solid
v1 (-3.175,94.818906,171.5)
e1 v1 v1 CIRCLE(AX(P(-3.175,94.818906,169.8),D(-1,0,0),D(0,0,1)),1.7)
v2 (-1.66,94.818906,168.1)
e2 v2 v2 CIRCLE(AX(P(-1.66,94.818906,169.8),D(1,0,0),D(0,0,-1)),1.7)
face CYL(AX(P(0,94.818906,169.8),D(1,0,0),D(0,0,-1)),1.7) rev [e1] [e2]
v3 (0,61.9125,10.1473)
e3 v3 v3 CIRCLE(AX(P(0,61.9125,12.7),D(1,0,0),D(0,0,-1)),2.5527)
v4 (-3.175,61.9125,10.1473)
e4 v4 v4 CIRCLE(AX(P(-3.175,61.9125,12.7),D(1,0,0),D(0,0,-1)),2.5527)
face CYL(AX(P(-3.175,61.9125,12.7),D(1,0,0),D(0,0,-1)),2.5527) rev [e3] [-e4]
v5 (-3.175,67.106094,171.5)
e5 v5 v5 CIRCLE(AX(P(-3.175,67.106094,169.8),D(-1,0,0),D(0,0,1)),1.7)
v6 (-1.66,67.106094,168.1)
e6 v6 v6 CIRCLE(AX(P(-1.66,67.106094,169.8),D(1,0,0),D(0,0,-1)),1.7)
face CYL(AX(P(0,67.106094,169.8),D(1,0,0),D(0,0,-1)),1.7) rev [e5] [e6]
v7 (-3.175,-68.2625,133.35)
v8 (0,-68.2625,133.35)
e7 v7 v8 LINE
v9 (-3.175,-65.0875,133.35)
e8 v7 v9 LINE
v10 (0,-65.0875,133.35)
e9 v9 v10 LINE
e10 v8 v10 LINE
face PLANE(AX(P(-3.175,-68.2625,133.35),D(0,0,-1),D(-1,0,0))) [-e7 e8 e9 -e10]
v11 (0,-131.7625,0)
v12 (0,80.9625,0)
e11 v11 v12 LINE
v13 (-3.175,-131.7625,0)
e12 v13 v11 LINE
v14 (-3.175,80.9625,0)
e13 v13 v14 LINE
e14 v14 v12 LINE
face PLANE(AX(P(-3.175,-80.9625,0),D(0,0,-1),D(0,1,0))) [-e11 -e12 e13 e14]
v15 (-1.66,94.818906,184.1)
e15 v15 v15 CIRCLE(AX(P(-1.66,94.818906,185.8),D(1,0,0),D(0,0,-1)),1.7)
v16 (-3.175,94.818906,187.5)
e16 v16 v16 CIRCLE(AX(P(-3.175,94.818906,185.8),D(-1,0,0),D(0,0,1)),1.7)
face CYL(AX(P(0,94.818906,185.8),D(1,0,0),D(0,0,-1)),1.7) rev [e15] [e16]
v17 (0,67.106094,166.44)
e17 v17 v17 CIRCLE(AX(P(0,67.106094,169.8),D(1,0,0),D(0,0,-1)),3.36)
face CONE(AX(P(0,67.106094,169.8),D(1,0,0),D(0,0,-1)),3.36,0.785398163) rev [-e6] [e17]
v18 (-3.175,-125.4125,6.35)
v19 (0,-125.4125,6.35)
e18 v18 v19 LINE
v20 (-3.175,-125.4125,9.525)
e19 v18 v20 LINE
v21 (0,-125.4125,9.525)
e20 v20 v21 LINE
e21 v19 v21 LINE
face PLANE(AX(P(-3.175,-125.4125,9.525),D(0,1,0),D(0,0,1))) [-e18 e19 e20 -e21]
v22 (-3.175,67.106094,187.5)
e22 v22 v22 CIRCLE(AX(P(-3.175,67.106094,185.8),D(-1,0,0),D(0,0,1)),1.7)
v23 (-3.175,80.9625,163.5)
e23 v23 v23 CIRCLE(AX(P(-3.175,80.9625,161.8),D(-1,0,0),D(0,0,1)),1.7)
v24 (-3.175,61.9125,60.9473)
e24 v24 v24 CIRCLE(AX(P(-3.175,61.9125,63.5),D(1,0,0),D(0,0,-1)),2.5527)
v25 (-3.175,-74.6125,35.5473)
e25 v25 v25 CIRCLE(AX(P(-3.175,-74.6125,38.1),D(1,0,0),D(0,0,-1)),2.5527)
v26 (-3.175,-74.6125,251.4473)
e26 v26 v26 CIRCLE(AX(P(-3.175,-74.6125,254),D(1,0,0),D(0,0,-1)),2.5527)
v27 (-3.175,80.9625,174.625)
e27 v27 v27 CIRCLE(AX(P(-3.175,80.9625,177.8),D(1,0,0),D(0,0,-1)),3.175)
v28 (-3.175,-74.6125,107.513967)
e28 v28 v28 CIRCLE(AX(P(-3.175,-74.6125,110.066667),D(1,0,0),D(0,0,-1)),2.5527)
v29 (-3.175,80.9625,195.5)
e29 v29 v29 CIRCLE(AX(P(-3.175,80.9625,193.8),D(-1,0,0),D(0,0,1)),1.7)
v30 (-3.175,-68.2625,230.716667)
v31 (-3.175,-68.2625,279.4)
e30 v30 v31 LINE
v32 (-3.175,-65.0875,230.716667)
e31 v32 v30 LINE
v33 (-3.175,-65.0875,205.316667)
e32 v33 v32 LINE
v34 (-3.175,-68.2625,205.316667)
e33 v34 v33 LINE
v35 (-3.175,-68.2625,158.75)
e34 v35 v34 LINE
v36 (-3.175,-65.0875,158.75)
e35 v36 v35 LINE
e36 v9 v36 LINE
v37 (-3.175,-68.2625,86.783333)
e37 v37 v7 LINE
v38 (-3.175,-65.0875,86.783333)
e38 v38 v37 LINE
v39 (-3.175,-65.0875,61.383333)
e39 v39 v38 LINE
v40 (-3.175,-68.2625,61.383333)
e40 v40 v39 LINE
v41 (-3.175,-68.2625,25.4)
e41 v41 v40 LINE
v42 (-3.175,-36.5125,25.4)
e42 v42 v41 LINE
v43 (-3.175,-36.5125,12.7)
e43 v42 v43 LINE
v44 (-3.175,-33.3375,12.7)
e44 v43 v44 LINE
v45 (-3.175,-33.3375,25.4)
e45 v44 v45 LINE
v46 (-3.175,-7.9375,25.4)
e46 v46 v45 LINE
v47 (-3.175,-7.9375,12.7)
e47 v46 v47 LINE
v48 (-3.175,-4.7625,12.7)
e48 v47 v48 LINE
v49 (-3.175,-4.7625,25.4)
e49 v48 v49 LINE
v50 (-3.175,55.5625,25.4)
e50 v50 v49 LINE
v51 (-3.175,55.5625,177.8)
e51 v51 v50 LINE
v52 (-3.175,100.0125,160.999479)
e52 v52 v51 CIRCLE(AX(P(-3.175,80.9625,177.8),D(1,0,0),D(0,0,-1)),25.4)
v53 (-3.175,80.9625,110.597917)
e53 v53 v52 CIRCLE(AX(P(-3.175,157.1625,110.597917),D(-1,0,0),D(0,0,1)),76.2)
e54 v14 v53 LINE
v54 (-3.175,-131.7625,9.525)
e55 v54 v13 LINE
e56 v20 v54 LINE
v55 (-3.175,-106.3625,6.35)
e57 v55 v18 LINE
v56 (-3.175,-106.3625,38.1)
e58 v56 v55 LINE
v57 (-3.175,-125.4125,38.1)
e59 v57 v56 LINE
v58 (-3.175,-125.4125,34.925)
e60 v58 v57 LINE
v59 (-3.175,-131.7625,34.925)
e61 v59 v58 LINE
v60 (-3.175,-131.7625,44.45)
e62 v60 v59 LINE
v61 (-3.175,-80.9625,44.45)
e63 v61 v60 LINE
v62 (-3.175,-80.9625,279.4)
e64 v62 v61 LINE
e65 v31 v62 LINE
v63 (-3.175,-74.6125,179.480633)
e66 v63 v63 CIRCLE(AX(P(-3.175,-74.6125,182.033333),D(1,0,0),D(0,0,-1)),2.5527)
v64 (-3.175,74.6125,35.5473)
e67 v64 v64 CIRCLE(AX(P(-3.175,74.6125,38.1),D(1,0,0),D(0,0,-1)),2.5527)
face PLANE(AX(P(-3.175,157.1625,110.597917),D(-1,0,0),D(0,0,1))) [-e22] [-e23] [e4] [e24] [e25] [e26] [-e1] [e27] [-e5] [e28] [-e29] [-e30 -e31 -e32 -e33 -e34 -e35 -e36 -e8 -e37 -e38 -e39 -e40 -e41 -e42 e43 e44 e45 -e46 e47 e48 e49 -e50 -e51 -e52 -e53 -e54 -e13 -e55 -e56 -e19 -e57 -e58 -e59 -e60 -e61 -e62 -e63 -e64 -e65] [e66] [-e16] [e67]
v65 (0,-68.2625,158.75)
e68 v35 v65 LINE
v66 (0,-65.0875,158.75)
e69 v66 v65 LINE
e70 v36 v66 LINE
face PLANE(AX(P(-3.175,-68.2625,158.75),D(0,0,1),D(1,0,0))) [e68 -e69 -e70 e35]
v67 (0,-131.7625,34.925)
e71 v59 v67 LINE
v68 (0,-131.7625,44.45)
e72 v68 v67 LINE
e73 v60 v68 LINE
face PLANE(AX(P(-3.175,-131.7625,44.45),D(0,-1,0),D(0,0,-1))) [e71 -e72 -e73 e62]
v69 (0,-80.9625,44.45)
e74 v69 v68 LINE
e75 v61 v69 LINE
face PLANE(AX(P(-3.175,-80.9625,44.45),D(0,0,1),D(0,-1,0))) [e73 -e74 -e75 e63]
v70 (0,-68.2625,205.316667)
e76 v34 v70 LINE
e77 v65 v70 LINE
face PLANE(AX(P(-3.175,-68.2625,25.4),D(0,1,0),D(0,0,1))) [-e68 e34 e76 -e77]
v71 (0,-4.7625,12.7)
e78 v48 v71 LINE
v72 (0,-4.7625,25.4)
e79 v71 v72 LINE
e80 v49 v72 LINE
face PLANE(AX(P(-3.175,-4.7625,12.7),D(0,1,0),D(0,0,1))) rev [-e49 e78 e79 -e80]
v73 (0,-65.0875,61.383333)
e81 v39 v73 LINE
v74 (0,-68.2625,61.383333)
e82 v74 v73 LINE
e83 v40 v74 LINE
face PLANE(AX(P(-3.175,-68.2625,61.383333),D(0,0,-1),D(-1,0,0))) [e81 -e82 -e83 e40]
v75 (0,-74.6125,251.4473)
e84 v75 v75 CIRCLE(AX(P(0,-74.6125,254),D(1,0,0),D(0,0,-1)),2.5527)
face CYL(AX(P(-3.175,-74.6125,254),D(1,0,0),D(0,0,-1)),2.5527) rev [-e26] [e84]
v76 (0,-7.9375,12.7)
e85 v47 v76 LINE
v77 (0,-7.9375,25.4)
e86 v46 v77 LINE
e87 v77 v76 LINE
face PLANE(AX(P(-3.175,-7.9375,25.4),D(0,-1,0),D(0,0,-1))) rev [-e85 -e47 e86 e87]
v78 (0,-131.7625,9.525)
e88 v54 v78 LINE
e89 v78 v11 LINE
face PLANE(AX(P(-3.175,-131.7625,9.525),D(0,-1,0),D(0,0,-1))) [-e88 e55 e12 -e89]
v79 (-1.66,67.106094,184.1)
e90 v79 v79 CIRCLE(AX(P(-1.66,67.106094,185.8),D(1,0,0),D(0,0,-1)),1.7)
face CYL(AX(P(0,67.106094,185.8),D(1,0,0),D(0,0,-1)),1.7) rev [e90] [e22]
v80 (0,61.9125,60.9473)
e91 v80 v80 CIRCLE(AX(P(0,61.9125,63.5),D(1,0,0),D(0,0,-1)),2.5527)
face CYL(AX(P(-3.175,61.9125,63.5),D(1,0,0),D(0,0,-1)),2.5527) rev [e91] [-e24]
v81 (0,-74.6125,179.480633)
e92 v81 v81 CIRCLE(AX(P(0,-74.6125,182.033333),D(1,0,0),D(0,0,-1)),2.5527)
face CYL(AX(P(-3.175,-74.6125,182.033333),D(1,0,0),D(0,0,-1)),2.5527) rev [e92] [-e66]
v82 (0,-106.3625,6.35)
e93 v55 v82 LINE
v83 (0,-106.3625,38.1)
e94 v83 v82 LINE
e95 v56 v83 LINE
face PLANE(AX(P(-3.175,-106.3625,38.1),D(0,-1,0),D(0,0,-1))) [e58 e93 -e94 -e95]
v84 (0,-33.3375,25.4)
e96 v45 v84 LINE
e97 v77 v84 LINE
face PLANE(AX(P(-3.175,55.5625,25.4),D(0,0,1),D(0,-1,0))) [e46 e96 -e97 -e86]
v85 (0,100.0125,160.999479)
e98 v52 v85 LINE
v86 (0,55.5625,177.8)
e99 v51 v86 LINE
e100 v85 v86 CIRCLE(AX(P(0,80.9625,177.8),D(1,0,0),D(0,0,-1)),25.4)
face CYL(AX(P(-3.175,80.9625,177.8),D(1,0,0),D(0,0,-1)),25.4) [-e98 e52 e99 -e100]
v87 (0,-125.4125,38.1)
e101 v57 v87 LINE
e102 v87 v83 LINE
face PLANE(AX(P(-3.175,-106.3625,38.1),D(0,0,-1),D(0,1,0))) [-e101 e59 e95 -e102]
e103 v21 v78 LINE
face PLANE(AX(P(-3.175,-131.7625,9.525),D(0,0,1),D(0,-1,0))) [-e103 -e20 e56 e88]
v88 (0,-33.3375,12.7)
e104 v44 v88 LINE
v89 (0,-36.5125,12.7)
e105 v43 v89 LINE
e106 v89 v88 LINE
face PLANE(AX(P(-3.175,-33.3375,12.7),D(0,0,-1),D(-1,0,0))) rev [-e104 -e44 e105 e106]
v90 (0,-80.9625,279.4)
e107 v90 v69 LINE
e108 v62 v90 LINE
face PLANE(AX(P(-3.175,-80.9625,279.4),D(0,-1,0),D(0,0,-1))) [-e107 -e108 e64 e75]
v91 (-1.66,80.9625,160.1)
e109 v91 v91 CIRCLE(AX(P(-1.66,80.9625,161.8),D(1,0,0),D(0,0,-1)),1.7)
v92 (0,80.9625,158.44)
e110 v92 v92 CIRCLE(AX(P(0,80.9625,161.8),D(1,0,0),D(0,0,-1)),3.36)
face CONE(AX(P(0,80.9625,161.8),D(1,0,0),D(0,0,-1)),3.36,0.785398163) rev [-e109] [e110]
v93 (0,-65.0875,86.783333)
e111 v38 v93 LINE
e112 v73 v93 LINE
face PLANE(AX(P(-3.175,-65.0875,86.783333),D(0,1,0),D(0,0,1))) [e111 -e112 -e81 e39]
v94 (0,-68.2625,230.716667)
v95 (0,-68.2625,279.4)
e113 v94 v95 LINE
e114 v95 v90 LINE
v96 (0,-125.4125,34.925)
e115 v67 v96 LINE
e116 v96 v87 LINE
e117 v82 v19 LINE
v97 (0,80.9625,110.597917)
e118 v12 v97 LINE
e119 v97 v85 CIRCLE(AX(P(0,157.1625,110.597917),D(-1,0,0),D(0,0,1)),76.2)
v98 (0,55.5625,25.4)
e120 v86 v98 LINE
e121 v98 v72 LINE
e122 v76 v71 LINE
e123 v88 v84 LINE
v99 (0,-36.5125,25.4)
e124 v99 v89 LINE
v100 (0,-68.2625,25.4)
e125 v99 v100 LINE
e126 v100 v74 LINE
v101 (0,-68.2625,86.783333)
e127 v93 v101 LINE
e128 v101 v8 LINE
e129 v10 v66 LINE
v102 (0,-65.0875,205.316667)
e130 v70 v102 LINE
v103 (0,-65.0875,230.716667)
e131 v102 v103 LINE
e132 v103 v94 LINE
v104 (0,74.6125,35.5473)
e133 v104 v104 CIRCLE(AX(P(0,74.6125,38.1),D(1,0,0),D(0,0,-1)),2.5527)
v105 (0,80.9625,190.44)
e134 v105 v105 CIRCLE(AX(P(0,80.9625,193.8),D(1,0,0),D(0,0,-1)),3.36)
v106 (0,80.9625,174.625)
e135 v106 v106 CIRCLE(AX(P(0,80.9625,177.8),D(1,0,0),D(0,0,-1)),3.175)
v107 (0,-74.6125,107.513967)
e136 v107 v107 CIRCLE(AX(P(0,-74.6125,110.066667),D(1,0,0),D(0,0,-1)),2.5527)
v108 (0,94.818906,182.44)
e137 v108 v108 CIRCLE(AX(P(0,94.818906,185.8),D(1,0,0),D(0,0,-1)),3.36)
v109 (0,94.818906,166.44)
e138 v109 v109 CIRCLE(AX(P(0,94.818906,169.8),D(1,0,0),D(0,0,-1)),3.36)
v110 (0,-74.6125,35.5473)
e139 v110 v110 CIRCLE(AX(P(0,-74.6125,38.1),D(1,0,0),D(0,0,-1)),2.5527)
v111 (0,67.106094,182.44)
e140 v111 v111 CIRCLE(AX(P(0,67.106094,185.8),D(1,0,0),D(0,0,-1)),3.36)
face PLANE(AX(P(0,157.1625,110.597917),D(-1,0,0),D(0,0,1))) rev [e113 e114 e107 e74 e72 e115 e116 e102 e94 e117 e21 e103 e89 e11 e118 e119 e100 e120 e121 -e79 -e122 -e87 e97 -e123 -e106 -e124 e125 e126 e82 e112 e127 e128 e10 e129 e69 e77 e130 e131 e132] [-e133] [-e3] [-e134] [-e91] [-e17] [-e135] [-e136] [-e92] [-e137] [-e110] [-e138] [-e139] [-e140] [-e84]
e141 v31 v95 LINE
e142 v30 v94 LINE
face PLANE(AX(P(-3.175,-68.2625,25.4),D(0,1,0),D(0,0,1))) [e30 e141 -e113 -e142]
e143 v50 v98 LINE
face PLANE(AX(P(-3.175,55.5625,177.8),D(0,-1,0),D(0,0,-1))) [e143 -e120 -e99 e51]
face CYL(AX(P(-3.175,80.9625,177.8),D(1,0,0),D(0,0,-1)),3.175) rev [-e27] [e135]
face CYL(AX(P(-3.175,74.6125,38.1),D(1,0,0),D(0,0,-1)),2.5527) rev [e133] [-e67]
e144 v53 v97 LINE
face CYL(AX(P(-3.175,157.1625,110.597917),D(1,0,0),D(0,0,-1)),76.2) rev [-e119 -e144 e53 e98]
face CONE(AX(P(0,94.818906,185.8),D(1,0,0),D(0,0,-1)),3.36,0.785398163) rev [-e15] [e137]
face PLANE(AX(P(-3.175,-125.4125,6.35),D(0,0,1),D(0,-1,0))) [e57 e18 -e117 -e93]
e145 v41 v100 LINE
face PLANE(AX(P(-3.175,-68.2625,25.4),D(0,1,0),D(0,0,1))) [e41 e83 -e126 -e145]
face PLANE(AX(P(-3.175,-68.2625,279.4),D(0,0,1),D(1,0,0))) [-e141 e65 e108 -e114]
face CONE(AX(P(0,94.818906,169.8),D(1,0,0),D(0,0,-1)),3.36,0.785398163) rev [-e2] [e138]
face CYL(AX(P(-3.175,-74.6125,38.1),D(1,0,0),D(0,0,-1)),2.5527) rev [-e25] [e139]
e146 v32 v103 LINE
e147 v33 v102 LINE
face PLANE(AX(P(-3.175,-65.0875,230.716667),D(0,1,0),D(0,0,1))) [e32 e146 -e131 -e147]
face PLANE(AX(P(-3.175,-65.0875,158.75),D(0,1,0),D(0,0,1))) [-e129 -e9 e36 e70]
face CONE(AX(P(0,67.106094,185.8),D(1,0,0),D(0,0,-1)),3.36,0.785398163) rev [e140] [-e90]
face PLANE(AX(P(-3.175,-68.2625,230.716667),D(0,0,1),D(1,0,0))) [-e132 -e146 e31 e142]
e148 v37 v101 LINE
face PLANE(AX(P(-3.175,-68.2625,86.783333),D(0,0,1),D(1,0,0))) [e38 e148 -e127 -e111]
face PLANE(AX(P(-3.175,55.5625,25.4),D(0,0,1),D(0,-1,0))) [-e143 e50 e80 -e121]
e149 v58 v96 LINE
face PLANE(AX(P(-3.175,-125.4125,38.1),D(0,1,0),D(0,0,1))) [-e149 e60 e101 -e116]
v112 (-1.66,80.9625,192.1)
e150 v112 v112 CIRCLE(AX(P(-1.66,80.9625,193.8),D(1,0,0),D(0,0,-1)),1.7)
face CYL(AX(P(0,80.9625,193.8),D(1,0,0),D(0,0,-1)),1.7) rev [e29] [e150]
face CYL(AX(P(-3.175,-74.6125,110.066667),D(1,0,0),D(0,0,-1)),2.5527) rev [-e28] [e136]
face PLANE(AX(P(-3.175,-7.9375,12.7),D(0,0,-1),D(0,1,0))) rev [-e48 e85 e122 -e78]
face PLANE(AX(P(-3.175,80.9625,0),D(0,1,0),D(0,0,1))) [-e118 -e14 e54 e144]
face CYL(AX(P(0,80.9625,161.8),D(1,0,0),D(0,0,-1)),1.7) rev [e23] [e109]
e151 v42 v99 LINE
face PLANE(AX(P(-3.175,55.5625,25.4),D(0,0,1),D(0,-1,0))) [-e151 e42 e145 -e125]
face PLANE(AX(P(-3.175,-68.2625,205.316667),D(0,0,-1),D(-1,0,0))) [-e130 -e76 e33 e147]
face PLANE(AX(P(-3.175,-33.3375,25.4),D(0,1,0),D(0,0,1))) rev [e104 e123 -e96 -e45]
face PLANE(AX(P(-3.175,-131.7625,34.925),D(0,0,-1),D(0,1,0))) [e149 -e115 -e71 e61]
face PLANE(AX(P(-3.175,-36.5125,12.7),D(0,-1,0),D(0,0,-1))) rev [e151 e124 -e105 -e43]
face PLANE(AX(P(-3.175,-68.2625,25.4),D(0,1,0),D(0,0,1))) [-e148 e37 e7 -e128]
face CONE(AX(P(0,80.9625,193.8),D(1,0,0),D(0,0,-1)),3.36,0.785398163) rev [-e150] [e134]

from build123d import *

# Parameters (mm, degrees)
BASE_FLANGE1_DEPTH           = 3.175
SKETCH8_W                    = 12.7
SKETCH8_H                    = 3.175
CUT_EXTRUDE2_DEPTH           = 309.926847379
SKETCH11_R                   = 3.175
CUT_EXTRUDE4_DEPTH           = 309.926847379
SKETCH21_R                   = 2.5527
CUT_EXTRUDE5_DEPTH           = 309.926847379
SKETCH23_W                   = 25.4
SKETCH23_H                   = 3.175
TAB1_DEPTH                   = 3.175
CSK_FOR_M3_SFHCS1_AT_2_COUNT = 2
CSK_FOR_M3_SFHCS1_AT_2_PITCH = 16
CSK_FOR_M3_SFHCS1_AT_3_COUNT = 2
CSK_FOR_M3_SFHCS1_AT_3_PITCH = 27.712812921
CSK_FOR_M3_SFHCS1_AT_4_COUNT = 2
CSK_FOR_M3_SFHCS1_AT_4_PITCH = 32
CSK_FOR_M3_SFHCS1_AT_5_COUNT = 2
CSK_FOR_M3_SFHCS1_AT_5_PITCH = 27.712812921
CSK_FOR_M3_SFHCS1_AT_6_COUNT = 2
CSK_FOR_M3_SFHCS1_AT_6_PITCH = 16


# Sheet-metal steps are written as plain solids
with BuildPart() as part:
    # Sketch1 → Base-Flange1 (new body)
    with BuildSketch(Plane(origin=(0, 0, 0), x_dir=(0, 0, -1), z_dir=(1, 0, 0))):
        with BuildLine():
            Line((0, -80.9625), (0, 80.9625))
            Line((0, 80.9625), (-110.597916699, 80.9625))
            ThreePointArc((-110.597916699, 80.9625), (-137.538685062, 85.883926782), (-160.999479175, 100.0125))
            ThreePointArc((-160.999479175, 100.0125), (-201.559524406, 89.942756121), (-177.8, 55.5625))
            Line((-177.8, 55.5625), (-25.4, 55.5625))
            Line((-25.4, 55.5625), (-25.4, -68.2625))
            Line((-25.4, -68.2625), (-279.4, -68.2625))
            Line((-279.4, -68.2625), (-279.4, -80.9625))
            Line((-279.4, -80.9625), (-44.45, -80.9625))
            Line((-44.45, -80.9625), (-44.45, -131.7625))
            Line((-44.45, -131.7625), (-34.925, -131.7625))
            Line((-34.925, -131.7625), (-34.925, -125.4125))
            Line((-34.925, -125.4125), (-38.1, -125.4125))
            Line((-38.1, -125.4125), (-38.1, -106.3625))
            Line((-38.1, -106.3625), (-6.35, -106.3625))
            Line((-6.35, -106.3625), (-6.35, -125.4125))
            Line((-6.35, -125.4125), (-9.525, -125.4125))
            Line((-9.525, -125.4125), (-9.525, -131.7625))
            Line((-9.525, -131.7625), (0, -131.7625))
            Line((0, -131.7625), (0, -80.9625))
        make_face()
    extrude(amount=-BASE_FLANGE1_DEPTH)

    # Sketch8 → Cut-Extrude2 (cut, through all)
    with BuildSketch(Plane(origin=(0, 0, 0), x_dir=(0, 0, -1), z_dir=(1, 0, 0))):
        with Locations((-19.05, -6.35)):
            Rectangle(SKETCH8_W, SKETCH8_H)
        with Locations((-19.05, -34.925)):
            Rectangle(SKETCH8_W, SKETCH8_H)
    extrude(amount=-CUT_EXTRUDE2_DEPTH, mode=Mode.SUBTRACT)

    # Sketch11 → Cut-Extrude4 (cut, through all)
    with BuildSketch(Plane(origin=(0, 0, 0), x_dir=(0, 0, -1), z_dir=(1, 0, 0))):
        with Locations((-177.8, 80.9625)):
            Circle(SKETCH11_R)
    extrude(amount=-CUT_EXTRUDE4_DEPTH, mode=Mode.SUBTRACT)

    # Sketch21 → Cut-Extrude5 (cut, through all)
    with BuildSketch(Plane(origin=(0, 0, 0), x_dir=(0, 0, -1), z_dir=(1, 0, 0))):
        with Locations((-38.1, -74.6125)):
            Circle(SKETCH21_R)
        with Locations((-110.066666667, -74.6125)):
            Circle(SKETCH21_R)
        with Locations((-182.033333333, -74.6125)):
            Circle(SKETCH21_R)
        with Locations((-254, -74.6125)):
            Circle(SKETCH21_R)
        with Locations((-12.7, 61.9125)):
            Circle(SKETCH21_R)
        with Locations((-38.1, 74.6125)):
            Circle(SKETCH21_R)
        with Locations((-63.5, 61.9125)):
            Circle(SKETCH21_R)
    extrude(amount=-CUT_EXTRUDE5_DEPTH, mode=Mode.SUBTRACT)

    # Sketch23 → Tab1 (add)
    with BuildSketch(Plane(origin=(0, 0, 0), x_dir=(0, 0, -1), z_dir=(1, 0, 0))):
        with Locations((-218.016666667, -66.675)):
            Rectangle(SKETCH23_W, SKETCH23_H)
        with Locations((-146.05, -66.675)):
            Rectangle(SKETCH23_W, SKETCH23_H)
        with Locations((-74.083333333, -66.675)):
            Rectangle(SKETCH23_W, SKETCH23_H)
    extrude(amount=-TAB1_DEPTH)

    # Sketch25 → CSK for M3 SFHCS1 (revolve, cut)
    with BuildSketch(Plane(origin=(0, 80.9625, 161.8), x_dir=(0, 0, -1), z_dir=(0, 1, 0))):
        Polygon((0, 0), (0, 3.175), (1.7, 3.175), (1.7, 1.66), (3.36, 0), align=None)
    csk_for_m3_sfhcs1 = revolve(axis=Axis((6.35, 80.9625, 161.8), (-1, 0, 0)), mode=Mode.SUBTRACT)

    # CSK for M3 SFHCS1 at 2: CSK for M3 SFHCS1 ×2
    with Locations(*[Vector(0, -0.8660254037844389, 0.4999999999999998) * (i * CSK_FOR_M3_SFHCS1_AT_2_PITCH) for i in range(1, CSK_FOR_M3_SFHCS1_AT_2_COUNT)]):
        add(csk_for_m3_sfhcs1, mode=Mode.SUBTRACT)

    # CSK for M3 SFHCS1 at 3: CSK for M3 SFHCS1 ×2
    with Locations(*[Vector(0, -0.500000000000002, 0.8660254037844376) * (i * CSK_FOR_M3_SFHCS1_AT_3_PITCH) for i in range(1, CSK_FOR_M3_SFHCS1_AT_3_COUNT)]):
        add(csk_for_m3_sfhcs1, mode=Mode.SUBTRACT)

    # CSK for M3 SFHCS1 at 4: CSK for M3 SFHCS1 ×2
    with Locations(*[(0, 0, i * CSK_FOR_M3_SFHCS1_AT_4_PITCH) for i in range(1, CSK_FOR_M3_SFHCS1_AT_4_COUNT)]):
        add(csk_for_m3_sfhcs1, mode=Mode.SUBTRACT)

    # CSK for M3 SFHCS1 at 5: CSK for M3 SFHCS1 ×2
    with Locations(*[Vector(0, 0.5000000000000007, 0.8660254037844384) * (i * CSK_FOR_M3_SFHCS1_AT_5_PITCH) for i in range(1, CSK_FOR_M3_SFHCS1_AT_5_COUNT)]):
        add(csk_for_m3_sfhcs1, mode=Mode.SUBTRACT)

    # CSK for M3 SFHCS1 at 6: CSK for M3 SFHCS1 ×2
    with Locations(*[Vector(0, 0.8660254037844379, 0.5000000000000013) * (i * CSK_FOR_M3_SFHCS1_AT_6_PITCH) for i in range(1, CSK_FOR_M3_SFHCS1_AT_6_COUNT)]):
        add(csk_for_m3_sfhcs1, mode=Mode.SUBTRACT)


solid = part.part
